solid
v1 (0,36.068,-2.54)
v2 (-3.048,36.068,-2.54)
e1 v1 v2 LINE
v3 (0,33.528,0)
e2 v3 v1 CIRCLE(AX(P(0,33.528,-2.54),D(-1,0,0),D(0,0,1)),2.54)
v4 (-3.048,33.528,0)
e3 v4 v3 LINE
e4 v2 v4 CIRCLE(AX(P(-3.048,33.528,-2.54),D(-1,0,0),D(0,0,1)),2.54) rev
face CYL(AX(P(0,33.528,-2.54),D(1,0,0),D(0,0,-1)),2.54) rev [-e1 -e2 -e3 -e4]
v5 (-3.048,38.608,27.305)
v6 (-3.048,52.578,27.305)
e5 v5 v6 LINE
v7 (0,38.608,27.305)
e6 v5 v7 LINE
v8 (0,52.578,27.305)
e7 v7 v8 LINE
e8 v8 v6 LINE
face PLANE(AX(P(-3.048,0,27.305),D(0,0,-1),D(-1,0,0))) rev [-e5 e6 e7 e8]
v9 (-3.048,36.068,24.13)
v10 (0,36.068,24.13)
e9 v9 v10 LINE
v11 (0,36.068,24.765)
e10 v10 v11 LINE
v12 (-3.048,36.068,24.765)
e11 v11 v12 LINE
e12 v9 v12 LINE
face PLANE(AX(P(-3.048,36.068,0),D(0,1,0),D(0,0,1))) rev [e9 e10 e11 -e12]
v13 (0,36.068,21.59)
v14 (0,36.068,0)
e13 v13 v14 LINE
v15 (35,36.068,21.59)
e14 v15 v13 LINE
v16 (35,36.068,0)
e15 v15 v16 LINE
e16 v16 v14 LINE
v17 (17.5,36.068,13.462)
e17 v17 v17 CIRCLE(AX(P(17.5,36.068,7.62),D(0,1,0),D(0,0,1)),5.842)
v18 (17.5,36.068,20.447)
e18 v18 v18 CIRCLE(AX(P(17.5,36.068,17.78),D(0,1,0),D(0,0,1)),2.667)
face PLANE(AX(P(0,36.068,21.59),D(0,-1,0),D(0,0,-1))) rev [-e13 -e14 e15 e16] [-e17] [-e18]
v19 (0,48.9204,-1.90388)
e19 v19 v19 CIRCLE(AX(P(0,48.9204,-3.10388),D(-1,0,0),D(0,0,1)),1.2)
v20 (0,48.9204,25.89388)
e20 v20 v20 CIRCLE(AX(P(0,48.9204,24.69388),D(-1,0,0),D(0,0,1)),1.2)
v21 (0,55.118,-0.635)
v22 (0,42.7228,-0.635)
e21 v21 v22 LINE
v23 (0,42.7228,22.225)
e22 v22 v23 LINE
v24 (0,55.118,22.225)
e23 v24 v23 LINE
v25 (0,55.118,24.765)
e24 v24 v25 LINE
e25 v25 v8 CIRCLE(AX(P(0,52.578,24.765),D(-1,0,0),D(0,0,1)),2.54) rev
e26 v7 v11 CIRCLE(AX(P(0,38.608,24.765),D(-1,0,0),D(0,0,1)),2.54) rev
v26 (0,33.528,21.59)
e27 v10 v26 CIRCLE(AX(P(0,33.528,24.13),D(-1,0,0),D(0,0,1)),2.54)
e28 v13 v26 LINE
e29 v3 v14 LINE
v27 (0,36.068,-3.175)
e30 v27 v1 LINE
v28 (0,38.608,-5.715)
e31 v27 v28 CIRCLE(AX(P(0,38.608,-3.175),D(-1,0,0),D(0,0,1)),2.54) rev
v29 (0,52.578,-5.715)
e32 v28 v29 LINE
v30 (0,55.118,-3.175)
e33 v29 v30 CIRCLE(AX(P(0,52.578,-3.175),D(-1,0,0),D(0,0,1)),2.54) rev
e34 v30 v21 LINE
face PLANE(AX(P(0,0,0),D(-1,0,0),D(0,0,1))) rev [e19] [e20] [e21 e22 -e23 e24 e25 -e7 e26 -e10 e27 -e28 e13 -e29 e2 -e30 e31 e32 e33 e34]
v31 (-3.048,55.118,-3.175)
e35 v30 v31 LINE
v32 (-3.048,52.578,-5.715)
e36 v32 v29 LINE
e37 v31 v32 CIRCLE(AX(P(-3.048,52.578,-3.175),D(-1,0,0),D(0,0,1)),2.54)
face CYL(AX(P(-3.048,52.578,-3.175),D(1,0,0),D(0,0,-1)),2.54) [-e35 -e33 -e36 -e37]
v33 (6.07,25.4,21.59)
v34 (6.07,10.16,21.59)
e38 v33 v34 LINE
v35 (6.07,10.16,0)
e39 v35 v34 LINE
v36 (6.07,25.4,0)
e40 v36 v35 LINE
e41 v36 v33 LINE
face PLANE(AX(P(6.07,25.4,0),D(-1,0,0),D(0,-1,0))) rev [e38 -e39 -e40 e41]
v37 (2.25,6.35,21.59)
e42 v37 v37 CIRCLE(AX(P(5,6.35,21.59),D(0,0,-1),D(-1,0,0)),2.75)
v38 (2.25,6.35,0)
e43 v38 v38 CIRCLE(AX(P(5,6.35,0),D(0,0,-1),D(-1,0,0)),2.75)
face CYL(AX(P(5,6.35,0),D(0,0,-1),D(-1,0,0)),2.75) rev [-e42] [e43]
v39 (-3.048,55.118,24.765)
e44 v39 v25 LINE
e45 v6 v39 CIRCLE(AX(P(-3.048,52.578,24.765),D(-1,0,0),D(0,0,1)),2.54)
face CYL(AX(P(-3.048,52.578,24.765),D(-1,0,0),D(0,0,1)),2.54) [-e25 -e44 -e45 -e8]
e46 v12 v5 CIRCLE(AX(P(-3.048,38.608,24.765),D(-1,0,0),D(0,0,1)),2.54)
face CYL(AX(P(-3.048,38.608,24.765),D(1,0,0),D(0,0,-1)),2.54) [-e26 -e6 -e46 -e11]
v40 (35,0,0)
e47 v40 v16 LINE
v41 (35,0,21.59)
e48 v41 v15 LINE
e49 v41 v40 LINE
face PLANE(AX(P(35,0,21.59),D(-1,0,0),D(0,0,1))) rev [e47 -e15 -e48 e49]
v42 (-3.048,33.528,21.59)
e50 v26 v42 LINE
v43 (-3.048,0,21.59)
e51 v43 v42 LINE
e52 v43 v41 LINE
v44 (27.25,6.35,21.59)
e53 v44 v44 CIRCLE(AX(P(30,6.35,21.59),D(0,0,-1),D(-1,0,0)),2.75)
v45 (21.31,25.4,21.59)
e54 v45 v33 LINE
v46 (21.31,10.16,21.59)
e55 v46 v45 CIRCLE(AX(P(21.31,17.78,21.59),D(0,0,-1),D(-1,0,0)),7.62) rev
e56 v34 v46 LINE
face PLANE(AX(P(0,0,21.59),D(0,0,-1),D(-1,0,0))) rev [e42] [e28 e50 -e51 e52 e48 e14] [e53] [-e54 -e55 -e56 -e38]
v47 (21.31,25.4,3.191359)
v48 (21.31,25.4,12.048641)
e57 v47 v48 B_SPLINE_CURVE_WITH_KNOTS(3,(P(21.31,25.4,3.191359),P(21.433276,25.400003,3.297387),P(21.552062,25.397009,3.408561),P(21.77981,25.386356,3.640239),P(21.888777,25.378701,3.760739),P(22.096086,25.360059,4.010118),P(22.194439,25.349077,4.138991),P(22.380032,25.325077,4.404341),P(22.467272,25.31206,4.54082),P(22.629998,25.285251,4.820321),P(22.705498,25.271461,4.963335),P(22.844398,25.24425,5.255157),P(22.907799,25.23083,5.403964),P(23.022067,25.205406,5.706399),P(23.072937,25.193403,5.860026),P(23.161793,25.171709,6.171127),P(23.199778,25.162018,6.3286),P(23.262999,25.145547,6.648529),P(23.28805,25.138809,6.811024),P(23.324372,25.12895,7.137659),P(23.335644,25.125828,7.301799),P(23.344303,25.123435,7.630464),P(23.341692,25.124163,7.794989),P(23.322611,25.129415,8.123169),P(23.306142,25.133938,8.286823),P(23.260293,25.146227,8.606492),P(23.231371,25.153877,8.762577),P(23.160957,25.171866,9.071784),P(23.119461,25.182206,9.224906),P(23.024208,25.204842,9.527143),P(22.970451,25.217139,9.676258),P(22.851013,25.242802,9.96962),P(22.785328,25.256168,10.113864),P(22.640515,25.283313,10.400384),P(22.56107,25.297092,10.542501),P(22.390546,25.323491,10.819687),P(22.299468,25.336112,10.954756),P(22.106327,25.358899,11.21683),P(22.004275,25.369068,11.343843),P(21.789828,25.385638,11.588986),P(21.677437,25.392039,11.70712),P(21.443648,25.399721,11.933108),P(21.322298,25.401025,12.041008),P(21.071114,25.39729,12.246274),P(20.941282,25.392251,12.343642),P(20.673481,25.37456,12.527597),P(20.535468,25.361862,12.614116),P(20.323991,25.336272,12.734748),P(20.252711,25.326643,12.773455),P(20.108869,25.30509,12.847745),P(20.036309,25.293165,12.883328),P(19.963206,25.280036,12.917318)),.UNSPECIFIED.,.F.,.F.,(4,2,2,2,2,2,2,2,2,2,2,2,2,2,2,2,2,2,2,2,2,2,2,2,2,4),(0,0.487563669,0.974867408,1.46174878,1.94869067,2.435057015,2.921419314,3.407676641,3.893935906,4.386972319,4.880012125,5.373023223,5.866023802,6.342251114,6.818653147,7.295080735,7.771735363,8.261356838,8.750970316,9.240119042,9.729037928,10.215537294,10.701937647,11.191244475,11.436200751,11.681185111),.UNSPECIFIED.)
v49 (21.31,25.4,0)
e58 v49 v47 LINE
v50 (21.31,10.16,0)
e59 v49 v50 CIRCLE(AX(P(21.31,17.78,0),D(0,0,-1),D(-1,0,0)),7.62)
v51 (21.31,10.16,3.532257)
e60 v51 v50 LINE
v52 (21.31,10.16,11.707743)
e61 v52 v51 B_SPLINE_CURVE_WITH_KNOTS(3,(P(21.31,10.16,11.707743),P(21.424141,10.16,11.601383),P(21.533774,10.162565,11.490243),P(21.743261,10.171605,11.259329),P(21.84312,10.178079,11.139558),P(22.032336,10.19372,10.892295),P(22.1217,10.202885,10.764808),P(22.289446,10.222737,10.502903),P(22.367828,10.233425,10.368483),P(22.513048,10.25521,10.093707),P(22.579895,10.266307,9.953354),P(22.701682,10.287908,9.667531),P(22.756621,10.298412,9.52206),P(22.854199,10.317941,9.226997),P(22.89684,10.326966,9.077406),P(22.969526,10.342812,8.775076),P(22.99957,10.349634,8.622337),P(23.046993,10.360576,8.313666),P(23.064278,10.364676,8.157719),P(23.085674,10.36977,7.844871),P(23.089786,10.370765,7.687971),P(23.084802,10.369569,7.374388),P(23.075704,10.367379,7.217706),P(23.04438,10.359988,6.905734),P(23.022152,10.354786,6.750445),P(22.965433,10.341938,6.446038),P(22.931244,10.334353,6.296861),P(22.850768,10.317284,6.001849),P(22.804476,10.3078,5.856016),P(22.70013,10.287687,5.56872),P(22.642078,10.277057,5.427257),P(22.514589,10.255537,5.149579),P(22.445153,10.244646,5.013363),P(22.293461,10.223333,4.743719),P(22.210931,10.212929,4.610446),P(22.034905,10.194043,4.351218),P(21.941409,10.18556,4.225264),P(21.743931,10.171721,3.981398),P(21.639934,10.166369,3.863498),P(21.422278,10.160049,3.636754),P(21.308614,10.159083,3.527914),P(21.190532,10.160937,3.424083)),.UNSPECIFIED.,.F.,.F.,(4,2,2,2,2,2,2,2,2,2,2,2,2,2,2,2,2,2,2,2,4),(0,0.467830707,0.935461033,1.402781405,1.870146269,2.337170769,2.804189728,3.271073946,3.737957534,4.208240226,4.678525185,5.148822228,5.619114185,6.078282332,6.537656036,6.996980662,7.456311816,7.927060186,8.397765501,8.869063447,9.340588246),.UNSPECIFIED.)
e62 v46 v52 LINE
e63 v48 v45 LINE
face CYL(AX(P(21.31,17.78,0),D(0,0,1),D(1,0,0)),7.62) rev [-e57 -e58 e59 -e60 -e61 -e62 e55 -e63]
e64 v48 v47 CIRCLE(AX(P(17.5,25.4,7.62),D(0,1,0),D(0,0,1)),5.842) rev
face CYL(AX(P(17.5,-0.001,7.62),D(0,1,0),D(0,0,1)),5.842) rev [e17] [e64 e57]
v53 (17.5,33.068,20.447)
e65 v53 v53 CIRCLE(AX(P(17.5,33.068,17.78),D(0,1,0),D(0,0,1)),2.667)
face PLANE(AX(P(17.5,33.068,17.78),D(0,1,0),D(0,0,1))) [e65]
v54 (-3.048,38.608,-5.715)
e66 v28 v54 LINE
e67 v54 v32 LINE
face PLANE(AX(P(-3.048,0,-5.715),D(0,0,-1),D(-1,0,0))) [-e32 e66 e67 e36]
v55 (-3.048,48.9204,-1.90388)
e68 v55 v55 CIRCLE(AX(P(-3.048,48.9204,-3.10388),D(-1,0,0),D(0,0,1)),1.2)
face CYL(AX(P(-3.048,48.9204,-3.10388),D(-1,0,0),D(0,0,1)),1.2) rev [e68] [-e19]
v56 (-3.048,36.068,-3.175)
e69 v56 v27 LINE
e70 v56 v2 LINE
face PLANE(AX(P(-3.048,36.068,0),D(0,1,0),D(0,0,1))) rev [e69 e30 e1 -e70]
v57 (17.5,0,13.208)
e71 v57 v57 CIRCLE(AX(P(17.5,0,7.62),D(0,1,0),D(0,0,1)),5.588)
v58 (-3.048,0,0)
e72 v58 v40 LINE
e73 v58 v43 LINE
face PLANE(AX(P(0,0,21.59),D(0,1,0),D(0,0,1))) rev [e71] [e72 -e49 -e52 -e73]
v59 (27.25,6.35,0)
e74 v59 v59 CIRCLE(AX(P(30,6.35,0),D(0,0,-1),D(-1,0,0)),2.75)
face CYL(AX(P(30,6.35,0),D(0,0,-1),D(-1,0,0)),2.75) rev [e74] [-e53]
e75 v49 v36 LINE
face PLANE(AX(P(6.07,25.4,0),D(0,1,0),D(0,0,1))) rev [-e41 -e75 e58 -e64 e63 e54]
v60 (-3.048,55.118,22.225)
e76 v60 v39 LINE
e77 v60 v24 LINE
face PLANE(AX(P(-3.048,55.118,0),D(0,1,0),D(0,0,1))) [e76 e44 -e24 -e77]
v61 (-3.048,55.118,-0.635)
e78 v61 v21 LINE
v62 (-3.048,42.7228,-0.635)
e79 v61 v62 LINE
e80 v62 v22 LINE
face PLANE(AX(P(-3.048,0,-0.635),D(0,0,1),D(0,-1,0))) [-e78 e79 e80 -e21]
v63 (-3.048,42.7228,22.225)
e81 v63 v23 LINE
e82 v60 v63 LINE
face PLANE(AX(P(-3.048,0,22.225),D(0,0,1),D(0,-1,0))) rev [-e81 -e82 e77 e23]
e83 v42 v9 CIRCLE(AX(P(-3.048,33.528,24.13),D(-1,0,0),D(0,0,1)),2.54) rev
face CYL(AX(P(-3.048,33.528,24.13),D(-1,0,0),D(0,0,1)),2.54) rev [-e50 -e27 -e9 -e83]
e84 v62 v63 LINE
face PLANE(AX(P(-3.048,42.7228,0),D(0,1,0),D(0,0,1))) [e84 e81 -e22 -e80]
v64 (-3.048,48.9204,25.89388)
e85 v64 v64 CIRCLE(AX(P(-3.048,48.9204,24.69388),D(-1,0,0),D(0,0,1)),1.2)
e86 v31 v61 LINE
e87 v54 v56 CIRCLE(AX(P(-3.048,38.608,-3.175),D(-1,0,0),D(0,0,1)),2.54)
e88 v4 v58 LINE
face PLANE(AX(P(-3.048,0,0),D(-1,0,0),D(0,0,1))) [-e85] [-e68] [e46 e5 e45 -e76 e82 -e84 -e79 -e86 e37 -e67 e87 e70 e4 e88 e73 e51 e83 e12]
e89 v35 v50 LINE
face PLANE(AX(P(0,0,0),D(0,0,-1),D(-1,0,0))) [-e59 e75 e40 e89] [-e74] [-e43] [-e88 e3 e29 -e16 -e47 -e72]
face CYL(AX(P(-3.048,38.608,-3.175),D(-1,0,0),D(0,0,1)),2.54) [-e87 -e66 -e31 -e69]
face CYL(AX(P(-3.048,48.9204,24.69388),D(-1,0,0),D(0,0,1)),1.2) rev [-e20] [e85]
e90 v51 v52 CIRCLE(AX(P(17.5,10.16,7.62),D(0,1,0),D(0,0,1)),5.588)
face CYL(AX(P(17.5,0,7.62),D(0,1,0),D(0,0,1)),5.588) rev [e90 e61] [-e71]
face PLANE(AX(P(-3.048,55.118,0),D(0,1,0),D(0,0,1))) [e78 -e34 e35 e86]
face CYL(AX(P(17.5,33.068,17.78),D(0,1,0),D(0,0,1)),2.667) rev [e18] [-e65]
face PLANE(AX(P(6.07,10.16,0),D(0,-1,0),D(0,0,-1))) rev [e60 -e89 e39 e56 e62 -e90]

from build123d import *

# Parameters (mm, degrees)
SKETCH2_W            = 35
SKETCH2_H            = 36.068
BOSS_EXTRUDE1_DEPTH  = 21.59
M5_CLEARANCE_HOLE1_D = 5.5
SKETCH13_W           = 22.86
SKETCH13_H           = 15.24
CUT_EXTRUDE3_DEPTH   = 55.699439887
CUT_EXTRUDE1_REACH   = 56.699
SKETCH5_R            = 5.842
BOSS_EXTRUDE2_DEPTH  = 3.048
M2_CLEARANCE_HOLE1_D = 2.4
FILLET2_R            = 2.54
SKETCH11_R           = 2.667
CUT_EXTRUDE2_DEPTH   = 3
SKETCH14_R           = 5.588
CUT_EXTRUDE4_DEPTH   = 64.180572876
FILLET3_R            = 7.62


with BuildPart() as part:
    # Sketch2 → Boss-Extrude1 (new body)
    with BuildSketch(Plane.XY):
        with Locations((17.5, 18.034)):
            Rectangle(SKETCH2_W, SKETCH2_H)
    extrude(amount=BOSS_EXTRUDE1_DEPTH)

    # M5 Clearance Hole1 (through all)
    with Locations(Plane(origin=(0, 0, 0), x_dir=(1, 0, 0), z_dir=(0, 0, -1))):
        with Locations((5, -6.35), (30, -6.35)):
            Hole(M5_CLEARANCE_HOLE1_D / 2)

    # Sketch13 → Cut-Extrude3 (cut, through all)
    with BuildSketch(Plane.XY.offset(21.59)):
        with Locations((17.5, 17.78)):
            Rectangle(SKETCH13_W, SKETCH13_H)
    extrude(amount=-CUT_EXTRUDE3_DEPTH, mode=Mode.SUBTRACT)

    # Sketch5 → Cut-Extrude1 (cut, up to next)
    with BuildSketch(Plane(origin=(0, 36.068, 0), x_dir=(1, 0, 0), z_dir=(0, 1, 0)), mode=Mode.PRIVATE) as cut_extrude1_sk1:
        with Locations(Location((17.5, -7.62, 0), (0, 0, 270))):
            Circle(SKETCH5_R)
    cut_extrude1_tool1 = extrude(cut_extrude1_sk1.sketch, amount=-CUT_EXTRUDE1_REACH, mode=Mode.PRIVATE) & part.part
    add(cut_extrude1_tool1.solids().sort_by_distance((17.5, 36.068, 7.62))[0], mode=Mode.SUBTRACT)

    # Sketch7 → Boss-Extrude2 (add)
    with BuildSketch(Plane.ZY):
        Polygon((-5.715, 55.118), (-5.715, 36.068), (0, 36.068), (0, 0), (21.59, 0), (21.59, 36.068), (27.305, 36.068), (27.305, 55.118), (22.225, 55.118), (22.225, 42.7228), (-0.635, 42.7228), (-0.635, 55.118), align=None)
    extrude(amount=BOSS_EXTRUDE2_DEPTH)

    # M2 Clearance Hole1 (through all)
    with Locations(Plane.ZY.offset(3.048)):
        with Locations((-3.10388, 48.9204), (24.69388, 48.9204)):
            Hole(M2_CLEARANCE_HOLE1_D / 2)

    # Fillet2
    fillet2_edges = [part.edges().sort_by_distance(p)[0] for p in [
        (-1.524, 55.118, -5.715),
        (-1.524, 36.068, -5.715),
        (-1.524, 36.068, 0),
        (-1.524, 36.068, 21.59),
        (-1.524, 36.068, 27.305),
        (-1.524, 55.118, 27.305),
    ]]
    fillet(fillet2_edges, radius=FILLET2_R)

    # Sketch11 → Cut-Extrude2 (cut)
    with BuildSketch(Plane(origin=(0, 36.068, 0), x_dir=(1, 0, 0), z_dir=(0, 1, 0))):
        with Locations(Location((17.5, -17.78, 0), (0, 0, 270))):
            Circle(SKETCH11_R)
    extrude(amount=-CUT_EXTRUDE2_DEPTH, mode=Mode.SUBTRACT)

    # Sketch14 → Cut-Extrude4 (cut, through all)
    with BuildSketch(Plane(origin=(0, 10.16, 0), x_dir=(1, 0, 0), z_dir=(0, 1, 0))):
        with Locations(Location((17.5, -7.62, 0), (0, 0, 270))):
            Circle(SKETCH14_R)
    extrude(amount=-CUT_EXTRUDE4_DEPTH, mode=Mode.SUBTRACT)

    # Fillet3
    # the kernel refuses this fillet: 7.62 mm, written as the material it adds along each edge
    with BuildSketch(Plane(origin=(28.93, 25.4, 21.59), x_dir=(-1, 0, 0), z_dir=(0, 0, -1))) as fillet3_piece_1_section:
        with BuildLine():
            CenterArc((FILLET3_R, -FILLET3_R), FILLET3_R, 90, 90)
            Line((0, -FILLET3_R), (0, 0))
            Line((0, 0), (FILLET3_R, 0))
        make_face()
    fillet3_piece_1 = extrude(amount=21.59, mode=Mode.PRIVATE)
    fillet3_piece_1 = fillet3_piece_1 - Plane(origin=(17.5, 23.659865562, 7.62), x_dir=(0, 0, 1), z_dir=(0, 1, 0)) * Cylinder(5.842, 74, mode=Mode.PRIVATE)
    add(fillet3_piece_1)
    with BuildSketch(Plane(origin=(28.93, 10.16, 21.59), x_dir=(0, 1, 0), z_dir=(0, 0, -1))) as fillet3_piece_2_section:
        with BuildLine():
            CenterArc((FILLET3_R, -FILLET3_R), FILLET3_R, 90, 90)
            Line((0, -FILLET3_R), (0, 0))
            Line((0, 0), (FILLET3_R, 0))
        make_face()
    fillet3_piece_2 = extrude(amount=21.59, mode=Mode.PRIVATE)
    fillet3_piece_2 = fillet3_piece_2 - Plane(origin=(17.5, 11.896400625, 7.62), x_dir=(0, 0, 1), z_dir=(0, 1, 0)) * Cylinder(5.588, 74, mode=Mode.PRIVATE)
    add(fillet3_piece_2)


solid = part.part
